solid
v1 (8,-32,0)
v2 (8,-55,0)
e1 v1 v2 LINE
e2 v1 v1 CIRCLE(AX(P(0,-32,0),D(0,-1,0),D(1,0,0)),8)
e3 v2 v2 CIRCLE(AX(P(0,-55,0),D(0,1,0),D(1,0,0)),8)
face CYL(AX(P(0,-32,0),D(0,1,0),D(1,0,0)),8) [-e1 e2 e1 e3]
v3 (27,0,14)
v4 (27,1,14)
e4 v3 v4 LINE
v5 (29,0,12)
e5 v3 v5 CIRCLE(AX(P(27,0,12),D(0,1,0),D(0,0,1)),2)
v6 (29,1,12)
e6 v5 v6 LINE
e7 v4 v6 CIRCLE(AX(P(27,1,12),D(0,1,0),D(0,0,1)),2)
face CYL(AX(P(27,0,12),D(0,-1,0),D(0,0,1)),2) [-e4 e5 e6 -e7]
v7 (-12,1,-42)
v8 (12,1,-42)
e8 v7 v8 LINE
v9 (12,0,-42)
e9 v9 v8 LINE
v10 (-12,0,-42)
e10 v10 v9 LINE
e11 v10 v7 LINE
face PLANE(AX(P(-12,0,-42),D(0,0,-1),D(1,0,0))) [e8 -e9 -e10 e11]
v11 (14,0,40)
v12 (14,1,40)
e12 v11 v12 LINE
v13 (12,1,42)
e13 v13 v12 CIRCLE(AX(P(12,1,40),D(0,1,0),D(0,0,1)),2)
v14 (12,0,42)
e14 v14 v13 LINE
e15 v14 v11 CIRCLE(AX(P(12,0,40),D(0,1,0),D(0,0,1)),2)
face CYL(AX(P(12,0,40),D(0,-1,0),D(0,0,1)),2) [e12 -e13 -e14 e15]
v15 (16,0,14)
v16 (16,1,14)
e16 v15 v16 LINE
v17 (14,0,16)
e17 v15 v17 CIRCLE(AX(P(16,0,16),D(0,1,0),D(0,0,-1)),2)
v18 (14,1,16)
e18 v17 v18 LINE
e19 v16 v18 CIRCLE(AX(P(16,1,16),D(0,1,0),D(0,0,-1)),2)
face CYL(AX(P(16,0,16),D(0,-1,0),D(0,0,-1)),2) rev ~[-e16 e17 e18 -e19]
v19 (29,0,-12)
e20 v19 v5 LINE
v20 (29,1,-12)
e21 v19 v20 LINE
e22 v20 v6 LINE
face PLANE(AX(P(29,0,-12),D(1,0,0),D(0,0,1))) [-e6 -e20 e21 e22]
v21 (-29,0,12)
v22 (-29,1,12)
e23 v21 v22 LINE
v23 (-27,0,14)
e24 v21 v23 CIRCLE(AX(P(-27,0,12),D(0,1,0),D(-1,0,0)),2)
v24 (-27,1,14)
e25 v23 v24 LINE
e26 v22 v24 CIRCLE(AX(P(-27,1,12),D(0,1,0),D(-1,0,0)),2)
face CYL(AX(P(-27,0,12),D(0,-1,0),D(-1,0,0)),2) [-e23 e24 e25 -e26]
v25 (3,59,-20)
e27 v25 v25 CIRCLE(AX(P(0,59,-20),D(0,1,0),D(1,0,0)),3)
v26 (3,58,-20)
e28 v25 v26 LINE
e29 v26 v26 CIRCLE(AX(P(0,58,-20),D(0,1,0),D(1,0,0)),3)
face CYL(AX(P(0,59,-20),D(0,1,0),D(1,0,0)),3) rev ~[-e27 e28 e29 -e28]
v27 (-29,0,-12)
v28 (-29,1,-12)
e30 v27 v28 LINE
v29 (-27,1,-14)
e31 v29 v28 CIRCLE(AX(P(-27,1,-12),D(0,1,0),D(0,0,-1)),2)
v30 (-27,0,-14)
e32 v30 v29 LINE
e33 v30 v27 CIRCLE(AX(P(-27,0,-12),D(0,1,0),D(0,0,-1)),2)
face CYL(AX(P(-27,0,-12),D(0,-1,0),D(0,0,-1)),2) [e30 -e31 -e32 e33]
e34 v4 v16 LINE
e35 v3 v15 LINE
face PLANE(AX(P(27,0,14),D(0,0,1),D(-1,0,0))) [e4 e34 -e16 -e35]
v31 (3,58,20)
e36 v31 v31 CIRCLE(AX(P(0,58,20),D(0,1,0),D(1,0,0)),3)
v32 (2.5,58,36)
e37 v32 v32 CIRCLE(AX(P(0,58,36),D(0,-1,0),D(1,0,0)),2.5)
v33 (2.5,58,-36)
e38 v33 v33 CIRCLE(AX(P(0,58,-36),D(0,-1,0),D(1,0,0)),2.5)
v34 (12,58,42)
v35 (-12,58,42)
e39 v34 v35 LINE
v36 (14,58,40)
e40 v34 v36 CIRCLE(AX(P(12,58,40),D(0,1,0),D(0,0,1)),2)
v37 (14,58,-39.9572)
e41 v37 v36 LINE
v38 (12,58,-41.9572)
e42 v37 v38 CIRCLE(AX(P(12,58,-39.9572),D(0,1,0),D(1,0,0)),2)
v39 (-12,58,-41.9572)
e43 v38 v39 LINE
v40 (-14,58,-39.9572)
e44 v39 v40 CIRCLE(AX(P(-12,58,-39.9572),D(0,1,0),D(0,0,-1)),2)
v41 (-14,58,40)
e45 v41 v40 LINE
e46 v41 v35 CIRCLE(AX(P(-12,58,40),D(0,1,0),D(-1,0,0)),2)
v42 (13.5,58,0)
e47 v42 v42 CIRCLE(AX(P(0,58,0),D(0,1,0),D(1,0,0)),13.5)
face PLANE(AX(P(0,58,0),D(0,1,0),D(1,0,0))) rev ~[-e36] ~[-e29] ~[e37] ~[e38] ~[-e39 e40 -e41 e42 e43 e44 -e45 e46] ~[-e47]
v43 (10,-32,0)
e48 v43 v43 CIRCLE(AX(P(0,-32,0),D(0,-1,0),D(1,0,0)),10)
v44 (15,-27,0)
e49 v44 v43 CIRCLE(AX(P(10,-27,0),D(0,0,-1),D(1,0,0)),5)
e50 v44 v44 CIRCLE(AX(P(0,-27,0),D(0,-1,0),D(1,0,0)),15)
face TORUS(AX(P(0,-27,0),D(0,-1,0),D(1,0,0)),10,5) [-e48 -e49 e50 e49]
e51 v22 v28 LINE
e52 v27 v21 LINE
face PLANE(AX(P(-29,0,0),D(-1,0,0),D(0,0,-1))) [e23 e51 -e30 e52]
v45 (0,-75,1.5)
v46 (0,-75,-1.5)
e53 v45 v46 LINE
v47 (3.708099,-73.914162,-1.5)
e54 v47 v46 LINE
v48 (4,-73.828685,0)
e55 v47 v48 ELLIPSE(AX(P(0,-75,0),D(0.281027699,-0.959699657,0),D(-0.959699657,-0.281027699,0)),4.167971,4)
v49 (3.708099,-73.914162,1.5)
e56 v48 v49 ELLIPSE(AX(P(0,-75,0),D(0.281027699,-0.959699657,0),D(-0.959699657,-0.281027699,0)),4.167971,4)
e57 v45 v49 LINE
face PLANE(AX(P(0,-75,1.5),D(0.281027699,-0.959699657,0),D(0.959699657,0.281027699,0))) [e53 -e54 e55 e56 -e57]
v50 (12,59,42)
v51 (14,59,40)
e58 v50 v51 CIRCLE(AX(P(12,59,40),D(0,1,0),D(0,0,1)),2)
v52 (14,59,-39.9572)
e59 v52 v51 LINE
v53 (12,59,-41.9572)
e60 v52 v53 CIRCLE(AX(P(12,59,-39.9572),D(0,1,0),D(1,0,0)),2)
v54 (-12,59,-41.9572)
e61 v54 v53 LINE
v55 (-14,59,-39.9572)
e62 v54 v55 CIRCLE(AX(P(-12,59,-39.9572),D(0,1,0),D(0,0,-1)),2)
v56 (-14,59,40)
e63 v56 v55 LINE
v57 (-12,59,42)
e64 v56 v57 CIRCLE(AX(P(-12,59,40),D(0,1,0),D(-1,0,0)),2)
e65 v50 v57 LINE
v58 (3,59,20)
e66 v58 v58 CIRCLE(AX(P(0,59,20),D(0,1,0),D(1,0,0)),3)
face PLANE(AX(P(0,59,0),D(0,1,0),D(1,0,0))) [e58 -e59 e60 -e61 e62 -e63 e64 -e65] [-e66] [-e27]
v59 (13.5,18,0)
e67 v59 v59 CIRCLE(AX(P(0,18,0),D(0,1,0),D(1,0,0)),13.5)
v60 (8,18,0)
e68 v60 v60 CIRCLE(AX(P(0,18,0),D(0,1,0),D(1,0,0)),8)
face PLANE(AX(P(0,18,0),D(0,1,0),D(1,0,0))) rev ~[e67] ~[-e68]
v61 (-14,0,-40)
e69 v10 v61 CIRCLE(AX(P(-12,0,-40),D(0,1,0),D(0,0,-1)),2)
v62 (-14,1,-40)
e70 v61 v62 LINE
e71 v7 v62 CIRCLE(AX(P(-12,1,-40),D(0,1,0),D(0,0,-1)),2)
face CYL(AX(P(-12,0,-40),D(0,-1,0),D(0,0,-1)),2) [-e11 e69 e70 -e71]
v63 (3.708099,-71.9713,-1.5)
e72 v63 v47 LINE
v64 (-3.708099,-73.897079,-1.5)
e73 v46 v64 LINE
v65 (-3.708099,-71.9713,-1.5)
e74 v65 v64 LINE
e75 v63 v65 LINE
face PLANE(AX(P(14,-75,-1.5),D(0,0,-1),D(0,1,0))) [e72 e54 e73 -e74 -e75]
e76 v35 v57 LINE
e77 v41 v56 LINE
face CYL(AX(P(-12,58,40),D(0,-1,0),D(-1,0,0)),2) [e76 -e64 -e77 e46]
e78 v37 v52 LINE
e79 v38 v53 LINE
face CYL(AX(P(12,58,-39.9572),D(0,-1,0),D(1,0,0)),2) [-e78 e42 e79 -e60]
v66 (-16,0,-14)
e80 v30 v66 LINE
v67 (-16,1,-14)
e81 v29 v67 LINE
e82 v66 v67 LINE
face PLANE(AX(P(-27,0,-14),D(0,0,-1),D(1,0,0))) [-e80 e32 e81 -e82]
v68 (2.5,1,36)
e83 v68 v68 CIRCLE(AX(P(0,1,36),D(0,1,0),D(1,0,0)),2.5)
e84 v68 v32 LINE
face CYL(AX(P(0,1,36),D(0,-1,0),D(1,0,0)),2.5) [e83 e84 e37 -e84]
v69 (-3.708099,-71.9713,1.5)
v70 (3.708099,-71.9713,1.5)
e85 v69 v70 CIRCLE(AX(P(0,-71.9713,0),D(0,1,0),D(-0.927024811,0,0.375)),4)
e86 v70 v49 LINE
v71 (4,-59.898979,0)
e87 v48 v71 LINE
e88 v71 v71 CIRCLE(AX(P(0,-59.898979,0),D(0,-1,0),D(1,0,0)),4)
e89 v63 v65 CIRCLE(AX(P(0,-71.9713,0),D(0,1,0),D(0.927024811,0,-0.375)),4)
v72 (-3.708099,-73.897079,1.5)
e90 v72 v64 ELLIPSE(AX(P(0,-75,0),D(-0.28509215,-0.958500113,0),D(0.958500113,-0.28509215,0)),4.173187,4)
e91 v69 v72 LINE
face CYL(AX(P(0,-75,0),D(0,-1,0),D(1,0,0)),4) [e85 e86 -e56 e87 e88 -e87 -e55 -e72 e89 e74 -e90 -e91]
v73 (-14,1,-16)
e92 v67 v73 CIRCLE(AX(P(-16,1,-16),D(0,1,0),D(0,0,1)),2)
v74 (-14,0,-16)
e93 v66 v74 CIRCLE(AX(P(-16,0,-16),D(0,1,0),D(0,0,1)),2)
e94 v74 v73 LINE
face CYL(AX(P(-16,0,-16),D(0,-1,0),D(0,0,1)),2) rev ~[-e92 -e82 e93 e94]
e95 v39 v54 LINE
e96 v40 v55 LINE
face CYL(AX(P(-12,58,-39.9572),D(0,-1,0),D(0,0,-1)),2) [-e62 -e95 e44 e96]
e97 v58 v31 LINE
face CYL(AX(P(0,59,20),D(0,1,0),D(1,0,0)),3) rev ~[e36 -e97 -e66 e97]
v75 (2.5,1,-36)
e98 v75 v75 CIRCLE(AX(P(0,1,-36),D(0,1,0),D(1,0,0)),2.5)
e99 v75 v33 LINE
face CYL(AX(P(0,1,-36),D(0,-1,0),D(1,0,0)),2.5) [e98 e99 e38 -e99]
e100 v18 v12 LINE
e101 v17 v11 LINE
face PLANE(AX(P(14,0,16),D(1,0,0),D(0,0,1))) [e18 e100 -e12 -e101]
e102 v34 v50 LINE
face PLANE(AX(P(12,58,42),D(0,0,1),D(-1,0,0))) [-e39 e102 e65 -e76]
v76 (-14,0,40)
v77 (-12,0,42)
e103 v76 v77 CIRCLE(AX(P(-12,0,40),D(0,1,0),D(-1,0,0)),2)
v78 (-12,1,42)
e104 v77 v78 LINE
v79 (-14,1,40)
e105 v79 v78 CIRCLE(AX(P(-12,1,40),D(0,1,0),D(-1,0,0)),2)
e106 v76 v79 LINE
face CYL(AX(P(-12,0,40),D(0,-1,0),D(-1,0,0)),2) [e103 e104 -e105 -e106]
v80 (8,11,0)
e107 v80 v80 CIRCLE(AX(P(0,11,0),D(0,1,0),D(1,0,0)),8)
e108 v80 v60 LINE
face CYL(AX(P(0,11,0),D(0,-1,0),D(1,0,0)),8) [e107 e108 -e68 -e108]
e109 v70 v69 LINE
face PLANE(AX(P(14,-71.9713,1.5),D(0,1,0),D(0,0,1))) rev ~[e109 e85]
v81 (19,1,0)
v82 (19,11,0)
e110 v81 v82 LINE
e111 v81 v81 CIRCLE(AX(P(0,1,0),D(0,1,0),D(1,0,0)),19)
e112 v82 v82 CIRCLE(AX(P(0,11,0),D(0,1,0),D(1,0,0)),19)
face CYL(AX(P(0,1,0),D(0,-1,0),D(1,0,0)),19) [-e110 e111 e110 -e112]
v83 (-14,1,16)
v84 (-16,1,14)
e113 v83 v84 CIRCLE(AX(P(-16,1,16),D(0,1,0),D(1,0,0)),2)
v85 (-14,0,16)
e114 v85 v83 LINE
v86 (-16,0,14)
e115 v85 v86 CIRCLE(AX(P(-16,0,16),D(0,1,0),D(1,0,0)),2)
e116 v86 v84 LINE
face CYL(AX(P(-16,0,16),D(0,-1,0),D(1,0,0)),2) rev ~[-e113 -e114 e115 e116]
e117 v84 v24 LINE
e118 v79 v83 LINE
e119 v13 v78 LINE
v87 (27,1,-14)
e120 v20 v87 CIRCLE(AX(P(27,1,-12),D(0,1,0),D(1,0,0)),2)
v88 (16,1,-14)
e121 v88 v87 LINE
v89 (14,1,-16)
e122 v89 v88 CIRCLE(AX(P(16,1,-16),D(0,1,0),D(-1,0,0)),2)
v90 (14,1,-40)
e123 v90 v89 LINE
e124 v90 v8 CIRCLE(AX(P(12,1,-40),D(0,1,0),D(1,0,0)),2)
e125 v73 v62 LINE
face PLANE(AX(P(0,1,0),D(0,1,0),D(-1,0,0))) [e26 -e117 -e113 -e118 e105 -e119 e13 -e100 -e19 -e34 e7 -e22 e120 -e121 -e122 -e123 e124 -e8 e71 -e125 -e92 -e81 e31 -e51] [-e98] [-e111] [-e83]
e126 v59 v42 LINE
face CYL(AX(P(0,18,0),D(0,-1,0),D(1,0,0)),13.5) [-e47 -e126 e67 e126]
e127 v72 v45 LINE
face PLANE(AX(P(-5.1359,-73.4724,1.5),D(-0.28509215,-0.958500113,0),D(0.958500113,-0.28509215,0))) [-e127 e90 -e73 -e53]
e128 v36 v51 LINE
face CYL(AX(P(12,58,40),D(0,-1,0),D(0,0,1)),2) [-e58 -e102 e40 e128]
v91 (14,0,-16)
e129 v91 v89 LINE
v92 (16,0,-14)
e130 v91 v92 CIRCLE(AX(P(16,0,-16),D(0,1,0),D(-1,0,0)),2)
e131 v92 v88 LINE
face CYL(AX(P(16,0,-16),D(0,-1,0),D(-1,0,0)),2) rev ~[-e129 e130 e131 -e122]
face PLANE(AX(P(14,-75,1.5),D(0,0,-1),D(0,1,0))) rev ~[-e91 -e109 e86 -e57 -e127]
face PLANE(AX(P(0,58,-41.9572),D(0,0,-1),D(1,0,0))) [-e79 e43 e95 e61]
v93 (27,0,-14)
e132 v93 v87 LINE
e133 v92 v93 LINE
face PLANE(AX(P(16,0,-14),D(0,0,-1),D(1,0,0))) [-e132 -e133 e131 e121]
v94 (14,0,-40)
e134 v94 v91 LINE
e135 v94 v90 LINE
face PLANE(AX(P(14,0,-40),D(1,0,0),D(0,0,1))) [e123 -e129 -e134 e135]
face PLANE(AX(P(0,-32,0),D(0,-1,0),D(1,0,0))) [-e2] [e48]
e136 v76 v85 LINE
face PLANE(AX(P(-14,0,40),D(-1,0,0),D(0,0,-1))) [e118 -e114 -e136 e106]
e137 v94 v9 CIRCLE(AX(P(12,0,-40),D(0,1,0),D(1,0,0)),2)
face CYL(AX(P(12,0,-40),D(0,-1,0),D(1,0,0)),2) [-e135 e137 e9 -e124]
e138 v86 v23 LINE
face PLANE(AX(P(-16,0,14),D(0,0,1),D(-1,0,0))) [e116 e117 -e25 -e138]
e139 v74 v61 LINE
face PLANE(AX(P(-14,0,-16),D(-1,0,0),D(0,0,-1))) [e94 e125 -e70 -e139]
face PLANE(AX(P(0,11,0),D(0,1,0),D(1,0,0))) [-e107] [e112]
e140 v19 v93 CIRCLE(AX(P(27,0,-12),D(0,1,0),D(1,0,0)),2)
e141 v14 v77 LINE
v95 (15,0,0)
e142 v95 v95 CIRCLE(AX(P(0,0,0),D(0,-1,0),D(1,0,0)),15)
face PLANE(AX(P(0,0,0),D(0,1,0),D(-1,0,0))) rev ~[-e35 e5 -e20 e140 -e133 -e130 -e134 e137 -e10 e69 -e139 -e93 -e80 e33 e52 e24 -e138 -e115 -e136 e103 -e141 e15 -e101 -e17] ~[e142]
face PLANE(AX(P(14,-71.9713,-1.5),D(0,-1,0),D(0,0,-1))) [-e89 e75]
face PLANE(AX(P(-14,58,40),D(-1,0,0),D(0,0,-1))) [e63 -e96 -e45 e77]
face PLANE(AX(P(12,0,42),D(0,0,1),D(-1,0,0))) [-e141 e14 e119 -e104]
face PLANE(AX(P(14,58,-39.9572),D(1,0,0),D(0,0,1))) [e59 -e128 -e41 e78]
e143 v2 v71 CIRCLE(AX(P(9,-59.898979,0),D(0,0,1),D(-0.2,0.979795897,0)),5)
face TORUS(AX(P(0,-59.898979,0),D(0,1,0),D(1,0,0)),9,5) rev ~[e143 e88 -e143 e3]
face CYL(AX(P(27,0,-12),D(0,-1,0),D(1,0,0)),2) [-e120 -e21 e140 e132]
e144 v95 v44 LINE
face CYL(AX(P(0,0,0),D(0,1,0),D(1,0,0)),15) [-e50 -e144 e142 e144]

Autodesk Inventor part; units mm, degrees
ref_plane "YZ Plane" through (0, 0, 0) normal (1, 0, 0) x (0, 1, 0)
ref_plane "XZ Plane" through (0, 0, 0) normal (0, 1, 0) x (-1, 0, 0)
ref_plane "XY Plane" through (0, 0, 0) normal (0, 0, 1) x (1, 0, 0)
sketch "Sketch1" plane through (0, 0, 0) normal (0, 1, 0) x (-1, 0, 0)
  line L0 (29, 0) -> (29, -12)
  line L1 (27, -14) -> (16, -14)
  line L2 (-16, -14) -> (-27, -14)
  line L3 (-29, -12) -> (-29, 12)
  line L4 (-27, 14) -> (-16, 14)
  line L5 (16, 14) -> (27, 14)
  line L6 (29, 12) -> (29, 0)
  line L7 (14, -16) -> (14, -40)
  line L8 (12, -42) -> (-12, -42)
  line L9 (-14, -40) -> (-14, -16)
  line L10 (-14, 16) -> (-14, 40)
  line L11 (-12, 42) -> (12, 42)
  line L12 (14, 40) -> (14, 16)
  arc A0 (29, 12) -> (27, 14) centre (27, 12) ccw
  arc A1 (27, -14) -> (29, -12) centre (27, -12) ccw
  arc A2 (16, -14) -> (14, -16) centre (16, -16) ccw
  arc A3 (12, -42) -> (14, -40) centre (12, -40) ccw
  arc A4 (-14, -40) -> (-12, -42) centre (-12, -40) ccw
  arc A5 (-14, -16) -> (-16, -14) centre (-16, -16) ccw
  arc A6 (-29, -12) -> (-27, -14) centre (-27, -12) ccw
  arc A7 (-27, 14) -> (-29, 12) centre (-27, 12) ccw
  arc A8 (-16, 14) -> (-14, 16) centre (-16, 16) ccw
  arc A9 (-12, 42) -> (-14, 40) centre (-12, 40) ccw
  arc A10 (14, 40) -> (12, 42) centre (12, 40) ccw
  arc A11 (14, 16) -> (16, 14) centre (16, 16) ccw
  point P0 (0, 0)
  point P1 (29, -14)
  point P2 (14, -14)
  point P3 (-14, -14)
  point P4 (-29, -14)
  point P5 (-29, 14)
  point P6 (-14, 14)
  point P7 (14, -42)
  point P8 (-14, 42)
  point P9 (14, 42)
  dimension "d2" = 14
  dimension "d4" = 15
  dimension "d5" = 28
  dimension "d7" = 28
  dimension "d8" = 28
  dimension "d12" = 2
extrude "Extrusion1" add sketch "Sketch1" along normal blind 1
sketch "Sketch2" plane through (0, 1, 0) normal (0, 1, 0) x (1, 0, 0)
  circle A0 centre (0, 0) radius 19
  dimension "d15" = 38
extrude "Extrusion2" add sketch "Sketch2" along normal blind 10
sketch "Sketch3" plane through (0, 11, 0) normal (0, 1, 0) x (1, 0, 0)
  circle A0 centre (0, 0) radius 8
  dimension "d18" = 16
extrude "Extrusion3" add sketch "Sketch3" along normal blind 7
sketch "Sketch4" plane through (0, 18, 0) normal (0, 1, 0) x (1, 0, 0)
  circle A0 centre (0, 0) radius 13.5
  dimension "d21" = 27
extrude "Extrusion4" add sketch "Sketch4" along normal blind 40
sketch "Sketch5" plane through (0, 58, 0) normal (0, 1, 0) x (1, 0, 0)
  line L0 (0, 41.9572) -> (12, 41.9572)
  line L1 (14, 39.9572) -> (14, -40)
  line L2 (12, -42) -> (-12, -42)
  line L3 (-14, -40) -> (-14, 39.9572)
  line L4 (-12, 41.9572) -> (0, 41.9572)
  arc A0 (-12, 41.9572) -> (-14, 39.9572) centre (-12, 39.9572) ccw
  arc A1 (14, 39.9572) -> (12, 41.9572) centre (12, 39.9572) ccw
  arc A2 (12, -42) -> (14, -40) centre (12, -40) ccw
  arc A3 (-14, -40) -> (-12, -42) centre (-12, -40) ccw
  point P0 (0, 0)
  point P1 (-14, 41.9572)
  dimension "d24" = 2
extrude "Extrusion5" add sketch "Sketch5" along normal blind 1
sketch "Sketch6" plane through (0, 1, 0) normal (0, 1, 0) x (1, 0, 0)
  line L0 (0, 0) -> (0, 36)
  line L1 (0, 0) -> (0, -36)
  circle A0 centre (0, 36) radius 2.5
  circle A1 centre (0, -36) radius 2.5
  dimension "d27" = 36
  dimension "d28" = 36
  dimension "d29" = 5
  dimension "d30" = 5
extrude "Extrusion6" add sketch "Sketch6" along normal blind 58
sketch "Sketch7" plane through (0, 0, 0) normal (0, -1, 0) x (1, 0, 0)
  circle A0 centre (0, 0) radius 15
  dimension "d33" = 30
extrude "Extrusion7" add sketch "Sketch7" along normal blind 32
sketch "Sketch8" plane through (0, -32, 0) normal (0, -1, 0) x (1, 0, 0)
  circle A0 centre (0, 0) radius 8
  dimension "d36" = 16
extrude "Extrusion8" add sketch "Sketch8" along normal blind 43
fillet "Fillet1" radius 5 1 edges at (-15, -32, 0)
sketch "Sketch9" plane through (0, -75, 0) normal (0, -1, 0) x (1, 0, 0)
  circle A0 centre (0, 0) radius 4
  circle A1 centre (0, 0) radius 12.3979
  dimension "d40" = 8
extrude "Extrusion9" cut sketch "Sketch9" against normal blind 20
fillet "Fillet2" radius 5 1 edges at (-4, -55, 0)
sketch "Sketch10" plane through (14, 0, 40) normal (1, 0, 0) x (0, 0, -1)
  line L0 (36, -75) -> (44, -75) projected
  line L1 (36, -75) -> (38.5, -75)
  line L2 (38.5, -75) -> (38.5, -71.9713)
  line L3 (38.5, -71.9713) -> (36, -71.9713)
  line L4 (36, -71.9713) -> (36, -75)
  line L5 (44, -59.899) -> (44, -75) projected
  line L6 (44, -75) -> (41.5, -75)
  line L7 (41.5, -75) -> (41.5, -71.9713)
  line L8 (41.5, -71.9713) -> (44, -71.9713)
  line L9 (44, -71.9713) -> (44, -75)
  point P0 (40, 0)
  dimension "d44" = 2.5
  dimension "d45" = 2.5
extrude "Extrusion10" cut sketch "Sketch10" against normal blind 20
sketch "Sketch11" plane through (-3.7081, -71.9713, 1.5) normal (0, 0, 1) x (1, 0, 0)
  line L0 (7.4162, -3.0287) -> (0, -3.0287) projected
  line L1 (3.7081, -3.0287) -> (8.9248, -1.5011)
  line L2 (8.9248, -1.5011) -> (8.9248, -4.1511)
  line L3 (8.9248, -4.1511) -> (-1.9974, -3.8292)
  line L4 (-1.9974, -3.8292) -> (-1.4278, -1.5011)
  line L5 (-1.4278, -1.5011) -> (3.7081, -3.0287)
  point P0 (3.7081, 71.9713)
extrude "Extrusion11" cut sketch "Sketch11" against normal blind 20
sketch "Sketch12" plane through (0, 59, 0) normal (0, 1, 0) x (1, 0, 0)
  circle A0 centre (0, 20) radius 3
  circle A1 centre (0, -20) radius 3
  point P0 (0, 0)
  dimension "d51" = 6
  dimension "d52" = 6
extrude "Extrusion12" cut sketch "Sketch12" against normal blind 20
properties part number "marcadorNUEVO"
